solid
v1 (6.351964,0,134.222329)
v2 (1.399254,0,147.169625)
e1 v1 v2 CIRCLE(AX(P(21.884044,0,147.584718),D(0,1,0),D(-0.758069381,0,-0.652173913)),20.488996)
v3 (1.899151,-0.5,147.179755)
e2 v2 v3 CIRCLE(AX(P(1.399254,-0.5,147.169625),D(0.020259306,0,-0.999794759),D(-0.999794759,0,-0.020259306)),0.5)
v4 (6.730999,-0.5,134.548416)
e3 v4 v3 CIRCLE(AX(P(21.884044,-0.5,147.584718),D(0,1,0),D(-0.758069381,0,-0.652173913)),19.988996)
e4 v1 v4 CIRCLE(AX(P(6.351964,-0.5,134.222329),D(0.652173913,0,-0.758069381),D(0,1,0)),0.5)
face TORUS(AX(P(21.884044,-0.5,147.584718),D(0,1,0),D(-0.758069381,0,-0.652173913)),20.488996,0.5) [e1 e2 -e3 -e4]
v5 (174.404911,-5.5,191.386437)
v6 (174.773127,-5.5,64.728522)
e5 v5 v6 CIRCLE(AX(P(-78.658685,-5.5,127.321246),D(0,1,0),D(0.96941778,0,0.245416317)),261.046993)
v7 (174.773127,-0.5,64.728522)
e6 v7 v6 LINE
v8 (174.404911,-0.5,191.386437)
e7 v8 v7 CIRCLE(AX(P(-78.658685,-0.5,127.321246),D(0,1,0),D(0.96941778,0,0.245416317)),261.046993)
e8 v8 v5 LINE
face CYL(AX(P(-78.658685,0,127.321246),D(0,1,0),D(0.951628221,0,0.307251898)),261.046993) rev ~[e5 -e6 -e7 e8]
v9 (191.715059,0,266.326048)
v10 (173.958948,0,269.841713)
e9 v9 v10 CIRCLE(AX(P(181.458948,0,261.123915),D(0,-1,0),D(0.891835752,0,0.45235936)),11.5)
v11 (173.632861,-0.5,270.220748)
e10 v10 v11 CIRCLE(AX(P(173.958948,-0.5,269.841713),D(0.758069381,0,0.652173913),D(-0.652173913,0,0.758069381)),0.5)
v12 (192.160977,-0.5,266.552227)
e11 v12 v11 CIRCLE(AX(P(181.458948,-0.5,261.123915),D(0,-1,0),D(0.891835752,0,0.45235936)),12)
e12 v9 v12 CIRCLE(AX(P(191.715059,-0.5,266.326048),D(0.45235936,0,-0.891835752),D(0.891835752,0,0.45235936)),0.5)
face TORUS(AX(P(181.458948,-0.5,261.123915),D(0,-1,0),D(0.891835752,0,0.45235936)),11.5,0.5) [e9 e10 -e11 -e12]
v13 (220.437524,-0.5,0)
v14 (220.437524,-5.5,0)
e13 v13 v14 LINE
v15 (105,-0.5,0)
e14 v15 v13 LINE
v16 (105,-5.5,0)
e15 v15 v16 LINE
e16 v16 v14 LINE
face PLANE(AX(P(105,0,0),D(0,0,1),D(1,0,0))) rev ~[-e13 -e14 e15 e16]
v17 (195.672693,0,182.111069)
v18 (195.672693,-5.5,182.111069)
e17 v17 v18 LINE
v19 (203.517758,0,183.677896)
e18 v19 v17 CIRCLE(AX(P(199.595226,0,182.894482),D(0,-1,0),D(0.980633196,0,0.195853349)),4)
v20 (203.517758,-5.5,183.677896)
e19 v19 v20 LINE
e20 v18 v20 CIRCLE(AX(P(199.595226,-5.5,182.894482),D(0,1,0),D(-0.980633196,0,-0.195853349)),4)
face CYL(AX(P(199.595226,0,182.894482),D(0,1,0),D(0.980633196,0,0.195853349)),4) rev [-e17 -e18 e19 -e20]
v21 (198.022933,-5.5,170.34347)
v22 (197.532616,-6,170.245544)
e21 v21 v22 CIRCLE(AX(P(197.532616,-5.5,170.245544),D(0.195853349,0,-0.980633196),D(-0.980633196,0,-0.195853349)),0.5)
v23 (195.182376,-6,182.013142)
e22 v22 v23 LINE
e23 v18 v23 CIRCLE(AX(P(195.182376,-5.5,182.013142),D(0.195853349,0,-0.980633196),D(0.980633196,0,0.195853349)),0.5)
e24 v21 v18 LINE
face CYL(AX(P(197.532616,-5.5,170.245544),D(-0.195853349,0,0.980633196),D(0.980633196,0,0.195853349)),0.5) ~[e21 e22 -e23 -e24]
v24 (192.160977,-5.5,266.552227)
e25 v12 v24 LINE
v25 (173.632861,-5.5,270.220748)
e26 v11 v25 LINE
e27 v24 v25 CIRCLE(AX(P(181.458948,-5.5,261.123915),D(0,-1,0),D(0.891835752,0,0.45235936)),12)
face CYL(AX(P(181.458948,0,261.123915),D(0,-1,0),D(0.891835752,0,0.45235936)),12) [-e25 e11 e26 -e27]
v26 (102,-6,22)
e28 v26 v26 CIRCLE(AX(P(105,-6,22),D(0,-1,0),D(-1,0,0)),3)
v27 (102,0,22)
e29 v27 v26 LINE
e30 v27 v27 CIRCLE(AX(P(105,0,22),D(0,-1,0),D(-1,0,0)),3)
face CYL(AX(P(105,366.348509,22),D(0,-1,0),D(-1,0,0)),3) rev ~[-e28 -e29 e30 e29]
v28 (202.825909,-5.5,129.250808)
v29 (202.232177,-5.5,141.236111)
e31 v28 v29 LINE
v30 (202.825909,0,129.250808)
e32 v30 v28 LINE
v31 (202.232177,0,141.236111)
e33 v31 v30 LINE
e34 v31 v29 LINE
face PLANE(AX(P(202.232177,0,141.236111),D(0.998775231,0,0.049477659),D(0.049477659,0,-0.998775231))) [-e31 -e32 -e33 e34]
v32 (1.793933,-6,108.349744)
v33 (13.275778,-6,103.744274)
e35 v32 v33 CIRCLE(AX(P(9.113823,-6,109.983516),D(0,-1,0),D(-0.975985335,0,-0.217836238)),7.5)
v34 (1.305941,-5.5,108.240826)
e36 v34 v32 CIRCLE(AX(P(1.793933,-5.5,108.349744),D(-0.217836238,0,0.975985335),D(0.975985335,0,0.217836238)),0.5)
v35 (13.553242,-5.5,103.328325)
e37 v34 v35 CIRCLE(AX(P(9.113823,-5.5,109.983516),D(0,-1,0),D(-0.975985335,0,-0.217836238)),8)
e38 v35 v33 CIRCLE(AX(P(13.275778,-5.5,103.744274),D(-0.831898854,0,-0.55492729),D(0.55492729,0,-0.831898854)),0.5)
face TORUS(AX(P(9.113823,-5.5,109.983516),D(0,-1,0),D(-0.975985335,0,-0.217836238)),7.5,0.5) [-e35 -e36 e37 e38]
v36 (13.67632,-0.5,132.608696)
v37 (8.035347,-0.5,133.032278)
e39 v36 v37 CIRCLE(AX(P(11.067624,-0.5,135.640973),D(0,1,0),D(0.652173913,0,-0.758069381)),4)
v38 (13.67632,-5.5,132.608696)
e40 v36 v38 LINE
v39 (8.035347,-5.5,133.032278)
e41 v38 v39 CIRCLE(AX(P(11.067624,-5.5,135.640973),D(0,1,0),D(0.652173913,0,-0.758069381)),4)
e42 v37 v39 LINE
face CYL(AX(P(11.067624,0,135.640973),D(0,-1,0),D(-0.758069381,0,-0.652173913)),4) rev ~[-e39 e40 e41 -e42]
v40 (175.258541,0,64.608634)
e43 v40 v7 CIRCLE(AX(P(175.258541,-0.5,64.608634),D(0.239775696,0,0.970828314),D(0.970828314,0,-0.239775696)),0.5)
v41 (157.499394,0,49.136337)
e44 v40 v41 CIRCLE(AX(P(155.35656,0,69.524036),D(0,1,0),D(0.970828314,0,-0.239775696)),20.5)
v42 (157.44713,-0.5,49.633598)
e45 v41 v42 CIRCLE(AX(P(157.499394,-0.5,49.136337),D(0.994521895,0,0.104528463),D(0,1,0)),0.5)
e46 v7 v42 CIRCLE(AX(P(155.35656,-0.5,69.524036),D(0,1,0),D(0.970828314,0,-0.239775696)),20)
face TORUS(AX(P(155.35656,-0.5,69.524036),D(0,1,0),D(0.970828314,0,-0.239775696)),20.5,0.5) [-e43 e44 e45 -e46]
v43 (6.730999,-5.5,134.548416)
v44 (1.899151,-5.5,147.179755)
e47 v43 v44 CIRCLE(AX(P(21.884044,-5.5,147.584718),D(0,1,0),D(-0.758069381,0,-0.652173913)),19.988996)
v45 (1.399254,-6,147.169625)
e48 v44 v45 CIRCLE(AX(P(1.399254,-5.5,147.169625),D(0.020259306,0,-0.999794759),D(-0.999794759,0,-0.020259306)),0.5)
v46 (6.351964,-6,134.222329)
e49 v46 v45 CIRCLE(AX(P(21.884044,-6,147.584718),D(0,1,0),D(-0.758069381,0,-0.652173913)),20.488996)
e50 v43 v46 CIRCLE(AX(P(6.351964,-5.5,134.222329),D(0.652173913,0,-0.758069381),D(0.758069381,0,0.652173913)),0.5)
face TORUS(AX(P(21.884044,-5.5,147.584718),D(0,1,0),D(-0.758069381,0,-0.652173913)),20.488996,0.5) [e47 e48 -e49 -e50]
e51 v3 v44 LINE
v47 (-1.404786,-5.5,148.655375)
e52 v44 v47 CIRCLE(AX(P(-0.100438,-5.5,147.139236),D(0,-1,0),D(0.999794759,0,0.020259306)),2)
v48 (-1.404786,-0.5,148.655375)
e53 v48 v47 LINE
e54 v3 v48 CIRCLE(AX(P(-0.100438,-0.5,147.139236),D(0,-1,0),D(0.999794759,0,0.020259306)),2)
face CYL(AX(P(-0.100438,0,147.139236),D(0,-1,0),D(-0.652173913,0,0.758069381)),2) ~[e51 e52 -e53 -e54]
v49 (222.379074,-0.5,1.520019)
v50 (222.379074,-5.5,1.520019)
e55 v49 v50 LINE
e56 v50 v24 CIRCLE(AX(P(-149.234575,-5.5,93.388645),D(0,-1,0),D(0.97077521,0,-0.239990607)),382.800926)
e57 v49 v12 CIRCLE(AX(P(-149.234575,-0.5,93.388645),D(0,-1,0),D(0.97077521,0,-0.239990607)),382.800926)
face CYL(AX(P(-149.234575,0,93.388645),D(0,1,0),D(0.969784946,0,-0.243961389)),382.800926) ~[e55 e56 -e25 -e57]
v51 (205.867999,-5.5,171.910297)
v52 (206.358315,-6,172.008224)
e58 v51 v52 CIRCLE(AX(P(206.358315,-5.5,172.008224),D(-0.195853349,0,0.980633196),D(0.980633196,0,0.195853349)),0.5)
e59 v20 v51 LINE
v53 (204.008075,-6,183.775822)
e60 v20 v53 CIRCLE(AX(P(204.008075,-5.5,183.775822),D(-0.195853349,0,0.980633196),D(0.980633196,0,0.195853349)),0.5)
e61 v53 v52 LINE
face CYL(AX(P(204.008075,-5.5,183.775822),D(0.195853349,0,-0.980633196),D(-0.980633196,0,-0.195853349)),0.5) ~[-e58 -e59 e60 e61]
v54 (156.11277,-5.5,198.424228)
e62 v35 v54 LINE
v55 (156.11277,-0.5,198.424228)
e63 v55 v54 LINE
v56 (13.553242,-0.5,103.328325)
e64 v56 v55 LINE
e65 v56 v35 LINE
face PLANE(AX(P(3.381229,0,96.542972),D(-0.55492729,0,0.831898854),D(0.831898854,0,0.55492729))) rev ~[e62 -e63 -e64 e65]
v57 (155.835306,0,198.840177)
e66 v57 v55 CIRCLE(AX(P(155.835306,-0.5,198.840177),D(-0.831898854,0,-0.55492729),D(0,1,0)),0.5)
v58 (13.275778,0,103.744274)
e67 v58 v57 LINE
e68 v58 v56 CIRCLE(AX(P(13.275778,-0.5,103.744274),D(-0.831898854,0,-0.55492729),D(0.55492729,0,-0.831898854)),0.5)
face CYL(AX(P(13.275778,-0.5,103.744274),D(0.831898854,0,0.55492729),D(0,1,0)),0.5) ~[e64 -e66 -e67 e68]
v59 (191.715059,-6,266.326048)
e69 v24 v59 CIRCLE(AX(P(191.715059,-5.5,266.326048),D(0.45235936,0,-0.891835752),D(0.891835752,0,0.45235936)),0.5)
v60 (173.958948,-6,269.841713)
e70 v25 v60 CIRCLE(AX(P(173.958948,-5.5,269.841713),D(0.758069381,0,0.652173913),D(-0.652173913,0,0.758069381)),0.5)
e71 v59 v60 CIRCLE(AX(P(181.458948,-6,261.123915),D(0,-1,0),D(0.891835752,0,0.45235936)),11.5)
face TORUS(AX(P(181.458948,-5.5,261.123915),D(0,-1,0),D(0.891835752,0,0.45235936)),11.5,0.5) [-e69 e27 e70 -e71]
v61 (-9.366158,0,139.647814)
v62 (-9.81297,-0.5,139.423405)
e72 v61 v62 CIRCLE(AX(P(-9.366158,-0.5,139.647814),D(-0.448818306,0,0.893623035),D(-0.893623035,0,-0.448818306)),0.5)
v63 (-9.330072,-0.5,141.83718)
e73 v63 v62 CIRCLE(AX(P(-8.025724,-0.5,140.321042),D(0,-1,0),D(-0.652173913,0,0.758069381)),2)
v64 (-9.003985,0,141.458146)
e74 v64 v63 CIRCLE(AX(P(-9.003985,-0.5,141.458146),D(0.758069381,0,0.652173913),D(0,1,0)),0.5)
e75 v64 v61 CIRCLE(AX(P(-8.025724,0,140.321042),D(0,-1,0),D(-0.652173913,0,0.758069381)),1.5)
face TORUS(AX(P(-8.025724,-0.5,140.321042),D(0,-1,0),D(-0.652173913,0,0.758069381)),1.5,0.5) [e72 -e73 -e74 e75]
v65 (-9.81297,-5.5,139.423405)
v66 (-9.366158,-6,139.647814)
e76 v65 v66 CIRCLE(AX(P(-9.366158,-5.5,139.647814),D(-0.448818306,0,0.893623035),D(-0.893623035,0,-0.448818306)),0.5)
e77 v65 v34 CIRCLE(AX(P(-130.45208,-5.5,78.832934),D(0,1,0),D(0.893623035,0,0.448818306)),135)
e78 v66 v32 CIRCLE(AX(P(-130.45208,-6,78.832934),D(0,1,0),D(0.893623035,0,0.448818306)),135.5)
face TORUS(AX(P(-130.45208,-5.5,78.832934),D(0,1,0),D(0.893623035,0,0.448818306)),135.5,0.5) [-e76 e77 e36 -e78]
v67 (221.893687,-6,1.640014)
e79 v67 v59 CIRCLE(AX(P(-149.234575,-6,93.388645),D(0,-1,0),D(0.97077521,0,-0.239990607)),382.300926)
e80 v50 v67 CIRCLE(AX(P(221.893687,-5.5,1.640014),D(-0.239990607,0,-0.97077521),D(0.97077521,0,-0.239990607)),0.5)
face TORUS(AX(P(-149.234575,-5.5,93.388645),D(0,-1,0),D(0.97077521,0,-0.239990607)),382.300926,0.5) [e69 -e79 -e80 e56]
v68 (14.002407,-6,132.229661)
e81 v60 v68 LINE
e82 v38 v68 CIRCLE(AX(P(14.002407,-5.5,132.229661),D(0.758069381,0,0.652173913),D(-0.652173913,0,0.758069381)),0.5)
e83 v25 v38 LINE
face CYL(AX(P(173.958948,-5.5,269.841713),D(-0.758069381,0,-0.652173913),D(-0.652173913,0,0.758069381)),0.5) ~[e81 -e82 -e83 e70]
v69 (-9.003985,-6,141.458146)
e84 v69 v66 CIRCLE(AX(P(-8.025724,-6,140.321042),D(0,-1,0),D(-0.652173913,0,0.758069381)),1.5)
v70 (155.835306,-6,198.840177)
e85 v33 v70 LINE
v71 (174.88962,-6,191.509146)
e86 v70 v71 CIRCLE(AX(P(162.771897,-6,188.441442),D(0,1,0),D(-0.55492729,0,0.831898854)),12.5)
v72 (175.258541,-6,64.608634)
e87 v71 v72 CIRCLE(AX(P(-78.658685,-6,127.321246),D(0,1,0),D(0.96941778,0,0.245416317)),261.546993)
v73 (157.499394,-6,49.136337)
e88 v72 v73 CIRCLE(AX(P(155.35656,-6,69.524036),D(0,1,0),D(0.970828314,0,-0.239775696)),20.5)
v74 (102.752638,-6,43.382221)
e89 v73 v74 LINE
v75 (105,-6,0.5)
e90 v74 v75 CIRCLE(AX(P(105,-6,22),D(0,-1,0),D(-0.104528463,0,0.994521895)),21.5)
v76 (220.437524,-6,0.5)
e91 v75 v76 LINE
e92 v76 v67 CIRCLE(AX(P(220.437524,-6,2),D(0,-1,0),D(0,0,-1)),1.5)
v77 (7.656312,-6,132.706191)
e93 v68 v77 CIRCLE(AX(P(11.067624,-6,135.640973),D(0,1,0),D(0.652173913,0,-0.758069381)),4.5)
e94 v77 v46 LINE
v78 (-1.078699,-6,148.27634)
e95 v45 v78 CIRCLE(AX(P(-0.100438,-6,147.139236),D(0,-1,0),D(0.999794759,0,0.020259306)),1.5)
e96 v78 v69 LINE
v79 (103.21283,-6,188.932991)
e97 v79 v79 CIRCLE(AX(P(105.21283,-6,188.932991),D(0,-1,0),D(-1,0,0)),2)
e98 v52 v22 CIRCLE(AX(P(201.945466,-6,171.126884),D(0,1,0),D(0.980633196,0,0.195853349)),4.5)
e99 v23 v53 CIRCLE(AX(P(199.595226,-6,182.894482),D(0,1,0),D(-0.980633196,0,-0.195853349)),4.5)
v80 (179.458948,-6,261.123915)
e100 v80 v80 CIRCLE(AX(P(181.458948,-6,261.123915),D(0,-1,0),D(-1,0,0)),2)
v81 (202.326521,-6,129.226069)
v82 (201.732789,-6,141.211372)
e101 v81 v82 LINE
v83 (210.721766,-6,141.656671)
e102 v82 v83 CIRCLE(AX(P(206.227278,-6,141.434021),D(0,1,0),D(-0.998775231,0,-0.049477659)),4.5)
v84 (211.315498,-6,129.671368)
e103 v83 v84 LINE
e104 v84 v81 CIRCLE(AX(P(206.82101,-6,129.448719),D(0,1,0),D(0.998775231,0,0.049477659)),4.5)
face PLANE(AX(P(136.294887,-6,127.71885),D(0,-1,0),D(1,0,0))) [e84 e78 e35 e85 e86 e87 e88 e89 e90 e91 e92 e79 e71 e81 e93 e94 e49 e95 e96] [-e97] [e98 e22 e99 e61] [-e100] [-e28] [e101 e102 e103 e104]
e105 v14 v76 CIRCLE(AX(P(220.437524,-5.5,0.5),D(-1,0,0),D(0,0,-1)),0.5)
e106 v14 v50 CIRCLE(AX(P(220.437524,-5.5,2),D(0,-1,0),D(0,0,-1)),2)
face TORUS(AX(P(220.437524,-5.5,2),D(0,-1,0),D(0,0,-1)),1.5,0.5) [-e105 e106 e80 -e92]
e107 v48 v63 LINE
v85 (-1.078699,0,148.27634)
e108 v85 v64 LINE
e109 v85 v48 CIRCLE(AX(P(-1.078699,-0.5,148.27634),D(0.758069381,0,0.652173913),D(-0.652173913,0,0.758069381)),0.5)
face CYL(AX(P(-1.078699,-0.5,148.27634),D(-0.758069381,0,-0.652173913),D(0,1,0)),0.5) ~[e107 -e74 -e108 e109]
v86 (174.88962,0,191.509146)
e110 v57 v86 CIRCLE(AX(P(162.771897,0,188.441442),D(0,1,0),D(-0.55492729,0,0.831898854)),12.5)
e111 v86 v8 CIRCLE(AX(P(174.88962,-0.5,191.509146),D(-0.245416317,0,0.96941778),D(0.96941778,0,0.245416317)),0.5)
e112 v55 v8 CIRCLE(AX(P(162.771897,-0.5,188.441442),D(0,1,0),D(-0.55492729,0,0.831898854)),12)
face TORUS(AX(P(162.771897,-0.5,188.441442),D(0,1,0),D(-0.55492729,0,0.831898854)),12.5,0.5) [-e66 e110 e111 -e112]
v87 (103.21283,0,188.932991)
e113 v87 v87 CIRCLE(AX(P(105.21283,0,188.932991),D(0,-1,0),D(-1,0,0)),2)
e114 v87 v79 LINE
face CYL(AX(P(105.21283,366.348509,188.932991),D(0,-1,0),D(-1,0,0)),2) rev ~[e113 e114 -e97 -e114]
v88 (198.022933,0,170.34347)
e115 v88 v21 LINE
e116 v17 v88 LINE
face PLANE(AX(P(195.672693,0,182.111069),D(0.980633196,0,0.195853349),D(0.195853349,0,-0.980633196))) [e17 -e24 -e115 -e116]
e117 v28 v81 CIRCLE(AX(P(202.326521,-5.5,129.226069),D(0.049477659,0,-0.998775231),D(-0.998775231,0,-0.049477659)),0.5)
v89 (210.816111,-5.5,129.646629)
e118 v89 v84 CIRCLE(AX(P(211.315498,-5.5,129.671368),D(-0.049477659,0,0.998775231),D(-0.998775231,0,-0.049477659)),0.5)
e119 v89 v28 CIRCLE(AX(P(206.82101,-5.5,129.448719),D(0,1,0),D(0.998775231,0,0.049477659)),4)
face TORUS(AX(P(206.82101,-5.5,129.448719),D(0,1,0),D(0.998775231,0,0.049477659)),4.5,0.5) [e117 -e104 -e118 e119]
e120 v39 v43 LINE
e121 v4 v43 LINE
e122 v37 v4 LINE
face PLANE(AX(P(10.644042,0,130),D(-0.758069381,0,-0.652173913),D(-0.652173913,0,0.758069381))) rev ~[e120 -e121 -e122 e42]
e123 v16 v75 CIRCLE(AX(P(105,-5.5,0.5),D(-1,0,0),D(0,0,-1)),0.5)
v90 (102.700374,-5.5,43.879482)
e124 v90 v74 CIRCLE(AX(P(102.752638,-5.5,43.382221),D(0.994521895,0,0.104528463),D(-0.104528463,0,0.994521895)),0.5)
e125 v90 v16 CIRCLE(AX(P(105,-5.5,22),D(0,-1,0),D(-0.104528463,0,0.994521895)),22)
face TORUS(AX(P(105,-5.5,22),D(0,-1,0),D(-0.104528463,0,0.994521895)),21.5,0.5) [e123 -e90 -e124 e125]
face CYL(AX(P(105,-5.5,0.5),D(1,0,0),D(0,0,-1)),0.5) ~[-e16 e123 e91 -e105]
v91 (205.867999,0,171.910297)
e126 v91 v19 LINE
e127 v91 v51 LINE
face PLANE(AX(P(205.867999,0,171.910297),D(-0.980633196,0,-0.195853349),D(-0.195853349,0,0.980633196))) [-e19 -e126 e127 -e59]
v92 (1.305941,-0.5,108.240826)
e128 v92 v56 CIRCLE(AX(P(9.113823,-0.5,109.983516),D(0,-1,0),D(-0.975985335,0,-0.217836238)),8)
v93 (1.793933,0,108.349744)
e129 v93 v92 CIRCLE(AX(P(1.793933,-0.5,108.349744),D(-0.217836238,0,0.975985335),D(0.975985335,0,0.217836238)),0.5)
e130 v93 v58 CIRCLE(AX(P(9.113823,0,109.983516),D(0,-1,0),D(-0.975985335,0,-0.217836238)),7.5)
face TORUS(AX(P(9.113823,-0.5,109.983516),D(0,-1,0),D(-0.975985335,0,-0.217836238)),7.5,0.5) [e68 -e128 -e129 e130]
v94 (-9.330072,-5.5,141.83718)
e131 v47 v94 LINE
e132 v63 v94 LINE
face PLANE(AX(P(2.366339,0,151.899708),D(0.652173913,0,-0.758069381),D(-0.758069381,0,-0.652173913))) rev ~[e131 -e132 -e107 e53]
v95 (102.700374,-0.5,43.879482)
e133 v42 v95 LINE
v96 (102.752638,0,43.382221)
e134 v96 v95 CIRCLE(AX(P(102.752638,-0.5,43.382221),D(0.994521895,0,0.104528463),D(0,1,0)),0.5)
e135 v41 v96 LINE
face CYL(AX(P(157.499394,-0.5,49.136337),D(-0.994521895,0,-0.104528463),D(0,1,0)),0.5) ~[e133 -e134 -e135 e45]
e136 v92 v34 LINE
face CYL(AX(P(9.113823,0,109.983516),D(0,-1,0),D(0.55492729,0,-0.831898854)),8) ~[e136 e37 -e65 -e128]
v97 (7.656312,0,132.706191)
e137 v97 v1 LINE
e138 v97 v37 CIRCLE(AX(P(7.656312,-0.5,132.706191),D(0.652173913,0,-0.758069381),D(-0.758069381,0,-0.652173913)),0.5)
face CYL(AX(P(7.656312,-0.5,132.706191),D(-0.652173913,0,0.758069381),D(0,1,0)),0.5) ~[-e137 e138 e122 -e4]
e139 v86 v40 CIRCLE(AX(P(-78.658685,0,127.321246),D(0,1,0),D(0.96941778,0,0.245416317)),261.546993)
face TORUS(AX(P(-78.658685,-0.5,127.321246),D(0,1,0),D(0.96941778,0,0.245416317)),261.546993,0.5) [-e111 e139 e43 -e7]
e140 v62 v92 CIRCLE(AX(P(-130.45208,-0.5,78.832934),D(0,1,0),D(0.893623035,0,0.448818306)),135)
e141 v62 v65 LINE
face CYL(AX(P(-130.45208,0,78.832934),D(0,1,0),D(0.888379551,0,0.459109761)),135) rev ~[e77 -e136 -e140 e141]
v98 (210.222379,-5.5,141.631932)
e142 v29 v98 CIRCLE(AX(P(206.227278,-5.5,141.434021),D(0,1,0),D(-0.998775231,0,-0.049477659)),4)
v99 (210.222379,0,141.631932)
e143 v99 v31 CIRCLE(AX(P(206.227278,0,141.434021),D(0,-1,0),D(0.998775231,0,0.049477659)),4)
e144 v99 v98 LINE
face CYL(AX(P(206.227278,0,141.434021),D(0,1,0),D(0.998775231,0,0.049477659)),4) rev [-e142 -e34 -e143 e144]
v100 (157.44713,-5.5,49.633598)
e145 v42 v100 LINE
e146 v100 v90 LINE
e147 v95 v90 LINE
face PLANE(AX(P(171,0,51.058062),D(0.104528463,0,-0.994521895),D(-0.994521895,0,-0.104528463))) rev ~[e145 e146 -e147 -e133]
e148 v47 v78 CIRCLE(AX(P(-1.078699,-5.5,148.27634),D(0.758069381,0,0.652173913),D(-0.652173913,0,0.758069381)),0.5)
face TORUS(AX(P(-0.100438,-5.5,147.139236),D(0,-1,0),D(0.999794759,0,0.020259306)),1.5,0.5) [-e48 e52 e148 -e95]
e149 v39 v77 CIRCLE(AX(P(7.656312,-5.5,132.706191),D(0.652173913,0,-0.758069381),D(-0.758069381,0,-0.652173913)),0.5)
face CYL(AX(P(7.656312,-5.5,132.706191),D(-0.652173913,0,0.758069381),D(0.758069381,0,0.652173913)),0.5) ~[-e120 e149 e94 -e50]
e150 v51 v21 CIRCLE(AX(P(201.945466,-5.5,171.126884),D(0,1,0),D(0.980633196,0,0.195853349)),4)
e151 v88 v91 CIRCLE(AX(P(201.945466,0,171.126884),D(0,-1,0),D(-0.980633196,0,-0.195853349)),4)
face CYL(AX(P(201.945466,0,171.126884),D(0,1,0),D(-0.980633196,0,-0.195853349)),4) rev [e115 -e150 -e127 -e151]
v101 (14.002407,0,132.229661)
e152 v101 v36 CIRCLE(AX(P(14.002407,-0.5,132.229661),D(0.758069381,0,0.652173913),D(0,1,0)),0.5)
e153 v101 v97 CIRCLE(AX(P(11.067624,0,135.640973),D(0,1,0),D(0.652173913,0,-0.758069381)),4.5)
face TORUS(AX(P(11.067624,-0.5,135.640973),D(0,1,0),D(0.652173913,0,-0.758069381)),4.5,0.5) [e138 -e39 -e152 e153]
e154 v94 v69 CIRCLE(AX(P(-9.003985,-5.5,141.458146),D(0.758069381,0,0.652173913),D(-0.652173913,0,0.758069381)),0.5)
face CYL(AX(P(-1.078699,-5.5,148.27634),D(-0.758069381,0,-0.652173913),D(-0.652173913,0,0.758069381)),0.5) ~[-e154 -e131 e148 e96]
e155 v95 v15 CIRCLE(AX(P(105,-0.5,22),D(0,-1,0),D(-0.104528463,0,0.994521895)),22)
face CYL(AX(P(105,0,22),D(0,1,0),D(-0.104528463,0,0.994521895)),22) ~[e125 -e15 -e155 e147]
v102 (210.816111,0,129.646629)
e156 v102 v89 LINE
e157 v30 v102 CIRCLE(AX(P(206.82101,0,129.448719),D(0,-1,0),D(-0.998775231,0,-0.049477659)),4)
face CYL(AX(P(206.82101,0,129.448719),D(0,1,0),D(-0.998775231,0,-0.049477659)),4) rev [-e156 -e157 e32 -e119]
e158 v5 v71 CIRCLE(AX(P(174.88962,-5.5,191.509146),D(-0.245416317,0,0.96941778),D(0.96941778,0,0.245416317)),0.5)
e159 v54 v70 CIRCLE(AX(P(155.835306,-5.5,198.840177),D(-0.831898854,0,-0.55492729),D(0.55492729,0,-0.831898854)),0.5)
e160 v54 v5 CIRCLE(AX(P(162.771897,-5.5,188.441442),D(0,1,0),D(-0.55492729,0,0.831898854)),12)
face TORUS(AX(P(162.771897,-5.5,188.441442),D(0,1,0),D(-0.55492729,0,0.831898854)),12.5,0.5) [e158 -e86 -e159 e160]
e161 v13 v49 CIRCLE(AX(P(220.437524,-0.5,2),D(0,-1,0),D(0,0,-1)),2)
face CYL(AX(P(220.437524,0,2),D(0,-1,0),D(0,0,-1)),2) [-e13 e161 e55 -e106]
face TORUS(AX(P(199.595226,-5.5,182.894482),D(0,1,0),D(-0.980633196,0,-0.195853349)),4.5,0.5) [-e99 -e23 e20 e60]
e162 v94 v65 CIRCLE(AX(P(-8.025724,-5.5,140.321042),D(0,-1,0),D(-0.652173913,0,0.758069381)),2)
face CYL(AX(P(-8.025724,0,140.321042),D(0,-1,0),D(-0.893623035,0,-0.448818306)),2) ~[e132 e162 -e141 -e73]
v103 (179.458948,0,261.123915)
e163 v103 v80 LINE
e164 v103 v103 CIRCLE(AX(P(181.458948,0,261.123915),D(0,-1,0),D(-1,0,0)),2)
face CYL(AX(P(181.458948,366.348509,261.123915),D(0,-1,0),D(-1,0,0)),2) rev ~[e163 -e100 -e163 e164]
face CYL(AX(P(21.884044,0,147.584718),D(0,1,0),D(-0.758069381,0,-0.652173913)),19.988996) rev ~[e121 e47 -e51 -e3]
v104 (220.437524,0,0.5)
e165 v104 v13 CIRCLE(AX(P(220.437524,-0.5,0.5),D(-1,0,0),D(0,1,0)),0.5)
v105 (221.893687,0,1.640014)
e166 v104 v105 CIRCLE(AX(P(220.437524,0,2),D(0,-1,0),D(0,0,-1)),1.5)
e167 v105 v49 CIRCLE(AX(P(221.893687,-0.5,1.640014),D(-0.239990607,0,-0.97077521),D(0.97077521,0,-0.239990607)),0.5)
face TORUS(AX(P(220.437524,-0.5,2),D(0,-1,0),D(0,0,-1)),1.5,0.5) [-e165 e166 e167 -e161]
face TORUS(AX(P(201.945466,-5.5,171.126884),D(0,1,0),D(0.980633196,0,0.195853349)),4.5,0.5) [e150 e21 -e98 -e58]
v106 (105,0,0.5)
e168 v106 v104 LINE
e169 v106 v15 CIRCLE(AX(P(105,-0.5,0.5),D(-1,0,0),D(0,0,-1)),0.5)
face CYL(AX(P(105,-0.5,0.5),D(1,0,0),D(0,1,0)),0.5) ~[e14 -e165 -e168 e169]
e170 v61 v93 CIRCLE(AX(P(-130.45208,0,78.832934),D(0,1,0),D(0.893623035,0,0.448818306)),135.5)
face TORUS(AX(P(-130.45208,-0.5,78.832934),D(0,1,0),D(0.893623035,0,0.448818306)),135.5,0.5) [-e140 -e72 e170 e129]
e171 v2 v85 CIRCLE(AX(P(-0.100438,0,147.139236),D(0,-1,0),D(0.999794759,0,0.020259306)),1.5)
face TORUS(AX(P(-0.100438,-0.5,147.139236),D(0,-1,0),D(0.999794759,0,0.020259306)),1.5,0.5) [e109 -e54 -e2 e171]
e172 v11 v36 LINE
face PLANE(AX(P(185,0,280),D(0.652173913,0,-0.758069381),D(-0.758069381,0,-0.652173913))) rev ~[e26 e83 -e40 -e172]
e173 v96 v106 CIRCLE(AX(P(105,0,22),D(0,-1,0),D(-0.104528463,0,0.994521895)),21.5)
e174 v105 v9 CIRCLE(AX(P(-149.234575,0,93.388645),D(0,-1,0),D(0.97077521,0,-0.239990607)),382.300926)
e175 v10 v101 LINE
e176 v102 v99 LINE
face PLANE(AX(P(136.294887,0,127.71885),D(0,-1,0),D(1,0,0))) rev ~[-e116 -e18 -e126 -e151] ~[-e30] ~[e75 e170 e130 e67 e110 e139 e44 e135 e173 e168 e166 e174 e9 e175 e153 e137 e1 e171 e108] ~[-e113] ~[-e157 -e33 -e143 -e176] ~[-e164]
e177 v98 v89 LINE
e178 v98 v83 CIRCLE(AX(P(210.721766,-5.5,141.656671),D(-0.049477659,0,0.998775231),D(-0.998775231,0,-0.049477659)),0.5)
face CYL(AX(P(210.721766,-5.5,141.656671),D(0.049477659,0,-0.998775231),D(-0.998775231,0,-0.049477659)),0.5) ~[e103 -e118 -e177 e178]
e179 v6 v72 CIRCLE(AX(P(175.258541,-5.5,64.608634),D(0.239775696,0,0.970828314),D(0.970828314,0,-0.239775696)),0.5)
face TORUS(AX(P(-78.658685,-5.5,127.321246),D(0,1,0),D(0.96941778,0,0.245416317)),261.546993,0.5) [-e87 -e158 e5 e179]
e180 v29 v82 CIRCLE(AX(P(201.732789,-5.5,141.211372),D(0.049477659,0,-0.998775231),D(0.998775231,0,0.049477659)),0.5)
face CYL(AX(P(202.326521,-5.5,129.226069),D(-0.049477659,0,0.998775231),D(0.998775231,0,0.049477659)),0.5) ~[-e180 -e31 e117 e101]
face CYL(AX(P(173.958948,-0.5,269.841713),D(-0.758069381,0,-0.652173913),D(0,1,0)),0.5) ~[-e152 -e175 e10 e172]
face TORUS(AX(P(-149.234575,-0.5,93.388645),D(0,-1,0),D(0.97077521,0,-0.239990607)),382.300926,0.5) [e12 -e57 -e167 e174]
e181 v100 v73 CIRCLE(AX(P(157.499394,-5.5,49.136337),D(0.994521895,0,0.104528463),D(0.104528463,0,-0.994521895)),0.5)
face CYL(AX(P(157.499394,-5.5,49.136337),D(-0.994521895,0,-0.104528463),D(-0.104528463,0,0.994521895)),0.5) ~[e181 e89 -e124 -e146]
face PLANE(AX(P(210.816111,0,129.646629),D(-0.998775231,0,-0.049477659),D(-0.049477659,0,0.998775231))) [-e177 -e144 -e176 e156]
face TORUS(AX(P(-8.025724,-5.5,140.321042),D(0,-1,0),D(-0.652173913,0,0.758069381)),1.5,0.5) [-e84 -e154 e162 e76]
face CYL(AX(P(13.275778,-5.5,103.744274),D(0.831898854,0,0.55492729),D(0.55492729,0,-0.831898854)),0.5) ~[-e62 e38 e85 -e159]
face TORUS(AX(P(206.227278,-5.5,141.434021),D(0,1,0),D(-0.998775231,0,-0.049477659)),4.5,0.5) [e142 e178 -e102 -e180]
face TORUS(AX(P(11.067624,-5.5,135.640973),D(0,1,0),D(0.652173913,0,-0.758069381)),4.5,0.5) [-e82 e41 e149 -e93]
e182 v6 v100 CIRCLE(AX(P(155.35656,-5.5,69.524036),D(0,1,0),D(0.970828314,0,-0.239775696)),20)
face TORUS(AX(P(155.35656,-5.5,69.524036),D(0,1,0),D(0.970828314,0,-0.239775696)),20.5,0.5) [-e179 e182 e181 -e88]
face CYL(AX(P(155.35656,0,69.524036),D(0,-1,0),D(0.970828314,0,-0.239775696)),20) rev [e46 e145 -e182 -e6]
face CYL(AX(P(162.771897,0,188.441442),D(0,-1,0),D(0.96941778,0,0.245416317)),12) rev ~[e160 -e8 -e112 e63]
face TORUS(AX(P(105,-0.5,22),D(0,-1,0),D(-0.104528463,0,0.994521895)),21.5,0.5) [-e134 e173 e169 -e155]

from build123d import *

# Parameters (mm, degrees)
F1_DEPTH = 6
F3_DEPTH = 6.001
F4_R     = 12
F5_R     = 8
F6_R     = 4
F7_R     = 20
F8_R     = 12
F10_D    = 6
F12_D    = 4
F13_R    = 2
F14_R    = 0.5


# Not quite as in the source:
# - a feature names something its author has since deleted; it is built from what else it names


with BuildPart() as f1:
    # F0 (on Front) → F1 (new body)
    with BuildSketch(Plane.XZ):
        with BuildLine():
            ThreePointArc((102.7003738081, 43.8794816981), (83.0301502354, 20.8486089627), (105, 0))
            Line((105, 0), (222, 0))
            ThreePointArc((222, 0), (230.2673095695, 143.5371087645), (185, 280))
            Line((185, 280), (10.6440422584, 130))
            Line((10.6440422584, 130), (6.7309987801, 134.5484162889))
            ThreePointArc((6.7309987801, 134.5484162889), (2.4989452542, 142.7084609792), (2.3663393595, 151.8997080148))
            Line((2.3663393595, 151.8997080148), (-10.5208401257, 140.812751493))
            ThreePointArc((-10.5208401257, 140.812751493), (-1.6535359727, 119.2796291851), (3.3812292532, 96.5429720343))
            Line((3.3812292532, 96.5429720343), (169.761000021, 207.5284299973))
            ThreePointArc((169.761000021, 207.5284299973), (182.3801238188, 129.3882640434), (171, 51.0580616779))
            Line((171, 51.0580616779), (102.7003738081, 43.8794816981))
        make_face()
    extrude(amount=F1_DEPTH)

    # F2 (on Front) → F3 (cut, through all)
    with BuildSketch(Plane.XZ):
        with BuildLine():
            ThreePointArc((203.5177584626, 183.6778955659), (198.811812282, 186.817014956), (195.6726928919, 182.1110687753))
            Line((195.6726928919, 182.1110687753), (198.0229330778, 170.3434704193))
            ThreePointArc((198.0229330778, 170.3434704193), (202.7288792584, 167.2043510293), (205.8679986485, 171.9102972099))
            Line((205.8679986485, 171.9102972099), (203.5177584626, 183.6778955659))
        make_face()
        with BuildLine():
            ThreePointArc((210.2223788251, 141.6319319116), (206.0293672683, 145.4291221998), (202.2321769801, 141.236110643))
            Line((202.2321769801, 141.236110643), (202.825908883, 129.2508078755))
            ThreePointArc((202.825908883, 129.2508078755), (207.0189204398, 125.4536175874), (210.816110728, 129.6466291441))
            Line((210.816110728, 129.6466291441), (210.2223788251, 141.6319319116))
        make_face()
    extrude(amount=F3_DEPTH, mode=Mode.SUBTRACT)

    # F4
    f4_edges = [f1.edges().sort_by_distance(p)[0] for p in [
        (185, -3, 280),
    ]]
    fillet(f4_edges, radius=F4_R)

    # F5
    f5_edges = [f1.edges().sort_by_distance(p)[0] for p in [
        (3.381229, -3, 96.542972),
    ]]
    fillet(f5_edges, radius=F5_R)

    # F6
    f6_edges = [f1.edges().sort_by_distance(p)[0] for p in [
        (10.644042, -3, 130),
    ]]
    fillet(f6_edges, radius=F6_R)

    # F7
    f7_edges = [f1.edges().sort_by_distance(p)[0] for p in [
        (171, -3, 51.058062),
    ]]
    fillet(f7_edges, radius=F7_R)

    # F8
    f8_edges = [f1.edges().sort_by_distance(p)[0] for p in [
        (169.761, -3, 207.52843),
    ]]
    fillet(f8_edges, radius=F8_R)

    # F10 (through all)
    with Locations(Plane(origin=(0, 0, 0), x_dir=(1, 0, 0), z_dir=(0, 1, 0))):
        with Locations((105, -22)):
            Hole(F10_D / 2)

    # F12 (through all)
    with Locations(Plane(origin=(0, 0, 0), x_dir=(1, 0, 0), z_dir=(0, 1, 0))):
        with Locations((105.212829657, -188.9329911228), (181.4589475746, -261.1239150848)):
            Hole(F12_D / 2)

    # F13
    f13_edges = [f1.edges().sort_by_distance(p)[0] for p in [
        (-10.52084, -3, 140.812751),
        (2.366339, -3, 151.899708),
        (222, -3, 0),
    ]]
    fillet(f13_edges, radius=F13_R)

    # F14
    f14_edges = [f1.edges().sort_by_distance(p)[0] for p in [
        (93.65459, -6, 201.414722),
        (130.073752, 0, 46.75654),
        (-3.294044, -6, 124.174238),
        (84.833006, -6, 150.876276),
        (84.833006, 0, 150.876276),
        (-3.294044, 0, 124.174238),
        (-9.986863, 0, 140.713386),
        (6.135602, 0, 102.558545),
        (-5.367429, 0, 145.246278),
        (0.715162, 0, 148.965378),
        (167.080901, 0, 199.641106),
        (3.21438, 0, 140.443038),
        (182.387204, 0, 128.08015),
        (7.383173, 0, 133.790347),
        (168.494422, 0, 54.444361),
        (10.768107, 0, 131.652203),
        (93.65459, 0, 201.414722),
        (83.03015, 0, 20.848609),
        (183.789671, 0, 272.895395),
        (162.718762, 0, 0),
        (231.102181, 0, 136.753387),
        (221.670414, 0, 0.425204),
        (-9.986863, -6, 140.713386),
        (6.135602, -6, 102.558545),
        (-5.367429, -6, 145.246278),
        (0.715162, -6, 148.965378),
        (167.080901, -6, 199.641106),
        (3.21438, -6, 140.443038),
        (182.387204, -6, 128.08015),
        (7.383173, -6, 133.790347),
        (168.494422, -6, 54.444361),
        (10.768107, -6, 131.652203),
        (130.073752, -6, 46.75654),
        (83.03015, -6, 20.848609),
        (183.789671, -6, 272.895395),
        (162.718762, -6, 0),
        (231.102181, -6, 136.753387),
        (221.670414, -6, 0.425204),
        (210.519245, -6, 135.639281),
        (207.01892, -6, 125.453618),
        (206.029367, -6, 145.429122),
        (202.529043, -6, 135.243459),
        (202.728879, -6, 167.204351),
        (196.847813, -6, 176.22727),
        (204.692879, -6, 177.794096),
        (198.811812, -6, 186.817015),
    ]]
    fillet(f14_edges, radius=F14_R)


solid = f1.part
